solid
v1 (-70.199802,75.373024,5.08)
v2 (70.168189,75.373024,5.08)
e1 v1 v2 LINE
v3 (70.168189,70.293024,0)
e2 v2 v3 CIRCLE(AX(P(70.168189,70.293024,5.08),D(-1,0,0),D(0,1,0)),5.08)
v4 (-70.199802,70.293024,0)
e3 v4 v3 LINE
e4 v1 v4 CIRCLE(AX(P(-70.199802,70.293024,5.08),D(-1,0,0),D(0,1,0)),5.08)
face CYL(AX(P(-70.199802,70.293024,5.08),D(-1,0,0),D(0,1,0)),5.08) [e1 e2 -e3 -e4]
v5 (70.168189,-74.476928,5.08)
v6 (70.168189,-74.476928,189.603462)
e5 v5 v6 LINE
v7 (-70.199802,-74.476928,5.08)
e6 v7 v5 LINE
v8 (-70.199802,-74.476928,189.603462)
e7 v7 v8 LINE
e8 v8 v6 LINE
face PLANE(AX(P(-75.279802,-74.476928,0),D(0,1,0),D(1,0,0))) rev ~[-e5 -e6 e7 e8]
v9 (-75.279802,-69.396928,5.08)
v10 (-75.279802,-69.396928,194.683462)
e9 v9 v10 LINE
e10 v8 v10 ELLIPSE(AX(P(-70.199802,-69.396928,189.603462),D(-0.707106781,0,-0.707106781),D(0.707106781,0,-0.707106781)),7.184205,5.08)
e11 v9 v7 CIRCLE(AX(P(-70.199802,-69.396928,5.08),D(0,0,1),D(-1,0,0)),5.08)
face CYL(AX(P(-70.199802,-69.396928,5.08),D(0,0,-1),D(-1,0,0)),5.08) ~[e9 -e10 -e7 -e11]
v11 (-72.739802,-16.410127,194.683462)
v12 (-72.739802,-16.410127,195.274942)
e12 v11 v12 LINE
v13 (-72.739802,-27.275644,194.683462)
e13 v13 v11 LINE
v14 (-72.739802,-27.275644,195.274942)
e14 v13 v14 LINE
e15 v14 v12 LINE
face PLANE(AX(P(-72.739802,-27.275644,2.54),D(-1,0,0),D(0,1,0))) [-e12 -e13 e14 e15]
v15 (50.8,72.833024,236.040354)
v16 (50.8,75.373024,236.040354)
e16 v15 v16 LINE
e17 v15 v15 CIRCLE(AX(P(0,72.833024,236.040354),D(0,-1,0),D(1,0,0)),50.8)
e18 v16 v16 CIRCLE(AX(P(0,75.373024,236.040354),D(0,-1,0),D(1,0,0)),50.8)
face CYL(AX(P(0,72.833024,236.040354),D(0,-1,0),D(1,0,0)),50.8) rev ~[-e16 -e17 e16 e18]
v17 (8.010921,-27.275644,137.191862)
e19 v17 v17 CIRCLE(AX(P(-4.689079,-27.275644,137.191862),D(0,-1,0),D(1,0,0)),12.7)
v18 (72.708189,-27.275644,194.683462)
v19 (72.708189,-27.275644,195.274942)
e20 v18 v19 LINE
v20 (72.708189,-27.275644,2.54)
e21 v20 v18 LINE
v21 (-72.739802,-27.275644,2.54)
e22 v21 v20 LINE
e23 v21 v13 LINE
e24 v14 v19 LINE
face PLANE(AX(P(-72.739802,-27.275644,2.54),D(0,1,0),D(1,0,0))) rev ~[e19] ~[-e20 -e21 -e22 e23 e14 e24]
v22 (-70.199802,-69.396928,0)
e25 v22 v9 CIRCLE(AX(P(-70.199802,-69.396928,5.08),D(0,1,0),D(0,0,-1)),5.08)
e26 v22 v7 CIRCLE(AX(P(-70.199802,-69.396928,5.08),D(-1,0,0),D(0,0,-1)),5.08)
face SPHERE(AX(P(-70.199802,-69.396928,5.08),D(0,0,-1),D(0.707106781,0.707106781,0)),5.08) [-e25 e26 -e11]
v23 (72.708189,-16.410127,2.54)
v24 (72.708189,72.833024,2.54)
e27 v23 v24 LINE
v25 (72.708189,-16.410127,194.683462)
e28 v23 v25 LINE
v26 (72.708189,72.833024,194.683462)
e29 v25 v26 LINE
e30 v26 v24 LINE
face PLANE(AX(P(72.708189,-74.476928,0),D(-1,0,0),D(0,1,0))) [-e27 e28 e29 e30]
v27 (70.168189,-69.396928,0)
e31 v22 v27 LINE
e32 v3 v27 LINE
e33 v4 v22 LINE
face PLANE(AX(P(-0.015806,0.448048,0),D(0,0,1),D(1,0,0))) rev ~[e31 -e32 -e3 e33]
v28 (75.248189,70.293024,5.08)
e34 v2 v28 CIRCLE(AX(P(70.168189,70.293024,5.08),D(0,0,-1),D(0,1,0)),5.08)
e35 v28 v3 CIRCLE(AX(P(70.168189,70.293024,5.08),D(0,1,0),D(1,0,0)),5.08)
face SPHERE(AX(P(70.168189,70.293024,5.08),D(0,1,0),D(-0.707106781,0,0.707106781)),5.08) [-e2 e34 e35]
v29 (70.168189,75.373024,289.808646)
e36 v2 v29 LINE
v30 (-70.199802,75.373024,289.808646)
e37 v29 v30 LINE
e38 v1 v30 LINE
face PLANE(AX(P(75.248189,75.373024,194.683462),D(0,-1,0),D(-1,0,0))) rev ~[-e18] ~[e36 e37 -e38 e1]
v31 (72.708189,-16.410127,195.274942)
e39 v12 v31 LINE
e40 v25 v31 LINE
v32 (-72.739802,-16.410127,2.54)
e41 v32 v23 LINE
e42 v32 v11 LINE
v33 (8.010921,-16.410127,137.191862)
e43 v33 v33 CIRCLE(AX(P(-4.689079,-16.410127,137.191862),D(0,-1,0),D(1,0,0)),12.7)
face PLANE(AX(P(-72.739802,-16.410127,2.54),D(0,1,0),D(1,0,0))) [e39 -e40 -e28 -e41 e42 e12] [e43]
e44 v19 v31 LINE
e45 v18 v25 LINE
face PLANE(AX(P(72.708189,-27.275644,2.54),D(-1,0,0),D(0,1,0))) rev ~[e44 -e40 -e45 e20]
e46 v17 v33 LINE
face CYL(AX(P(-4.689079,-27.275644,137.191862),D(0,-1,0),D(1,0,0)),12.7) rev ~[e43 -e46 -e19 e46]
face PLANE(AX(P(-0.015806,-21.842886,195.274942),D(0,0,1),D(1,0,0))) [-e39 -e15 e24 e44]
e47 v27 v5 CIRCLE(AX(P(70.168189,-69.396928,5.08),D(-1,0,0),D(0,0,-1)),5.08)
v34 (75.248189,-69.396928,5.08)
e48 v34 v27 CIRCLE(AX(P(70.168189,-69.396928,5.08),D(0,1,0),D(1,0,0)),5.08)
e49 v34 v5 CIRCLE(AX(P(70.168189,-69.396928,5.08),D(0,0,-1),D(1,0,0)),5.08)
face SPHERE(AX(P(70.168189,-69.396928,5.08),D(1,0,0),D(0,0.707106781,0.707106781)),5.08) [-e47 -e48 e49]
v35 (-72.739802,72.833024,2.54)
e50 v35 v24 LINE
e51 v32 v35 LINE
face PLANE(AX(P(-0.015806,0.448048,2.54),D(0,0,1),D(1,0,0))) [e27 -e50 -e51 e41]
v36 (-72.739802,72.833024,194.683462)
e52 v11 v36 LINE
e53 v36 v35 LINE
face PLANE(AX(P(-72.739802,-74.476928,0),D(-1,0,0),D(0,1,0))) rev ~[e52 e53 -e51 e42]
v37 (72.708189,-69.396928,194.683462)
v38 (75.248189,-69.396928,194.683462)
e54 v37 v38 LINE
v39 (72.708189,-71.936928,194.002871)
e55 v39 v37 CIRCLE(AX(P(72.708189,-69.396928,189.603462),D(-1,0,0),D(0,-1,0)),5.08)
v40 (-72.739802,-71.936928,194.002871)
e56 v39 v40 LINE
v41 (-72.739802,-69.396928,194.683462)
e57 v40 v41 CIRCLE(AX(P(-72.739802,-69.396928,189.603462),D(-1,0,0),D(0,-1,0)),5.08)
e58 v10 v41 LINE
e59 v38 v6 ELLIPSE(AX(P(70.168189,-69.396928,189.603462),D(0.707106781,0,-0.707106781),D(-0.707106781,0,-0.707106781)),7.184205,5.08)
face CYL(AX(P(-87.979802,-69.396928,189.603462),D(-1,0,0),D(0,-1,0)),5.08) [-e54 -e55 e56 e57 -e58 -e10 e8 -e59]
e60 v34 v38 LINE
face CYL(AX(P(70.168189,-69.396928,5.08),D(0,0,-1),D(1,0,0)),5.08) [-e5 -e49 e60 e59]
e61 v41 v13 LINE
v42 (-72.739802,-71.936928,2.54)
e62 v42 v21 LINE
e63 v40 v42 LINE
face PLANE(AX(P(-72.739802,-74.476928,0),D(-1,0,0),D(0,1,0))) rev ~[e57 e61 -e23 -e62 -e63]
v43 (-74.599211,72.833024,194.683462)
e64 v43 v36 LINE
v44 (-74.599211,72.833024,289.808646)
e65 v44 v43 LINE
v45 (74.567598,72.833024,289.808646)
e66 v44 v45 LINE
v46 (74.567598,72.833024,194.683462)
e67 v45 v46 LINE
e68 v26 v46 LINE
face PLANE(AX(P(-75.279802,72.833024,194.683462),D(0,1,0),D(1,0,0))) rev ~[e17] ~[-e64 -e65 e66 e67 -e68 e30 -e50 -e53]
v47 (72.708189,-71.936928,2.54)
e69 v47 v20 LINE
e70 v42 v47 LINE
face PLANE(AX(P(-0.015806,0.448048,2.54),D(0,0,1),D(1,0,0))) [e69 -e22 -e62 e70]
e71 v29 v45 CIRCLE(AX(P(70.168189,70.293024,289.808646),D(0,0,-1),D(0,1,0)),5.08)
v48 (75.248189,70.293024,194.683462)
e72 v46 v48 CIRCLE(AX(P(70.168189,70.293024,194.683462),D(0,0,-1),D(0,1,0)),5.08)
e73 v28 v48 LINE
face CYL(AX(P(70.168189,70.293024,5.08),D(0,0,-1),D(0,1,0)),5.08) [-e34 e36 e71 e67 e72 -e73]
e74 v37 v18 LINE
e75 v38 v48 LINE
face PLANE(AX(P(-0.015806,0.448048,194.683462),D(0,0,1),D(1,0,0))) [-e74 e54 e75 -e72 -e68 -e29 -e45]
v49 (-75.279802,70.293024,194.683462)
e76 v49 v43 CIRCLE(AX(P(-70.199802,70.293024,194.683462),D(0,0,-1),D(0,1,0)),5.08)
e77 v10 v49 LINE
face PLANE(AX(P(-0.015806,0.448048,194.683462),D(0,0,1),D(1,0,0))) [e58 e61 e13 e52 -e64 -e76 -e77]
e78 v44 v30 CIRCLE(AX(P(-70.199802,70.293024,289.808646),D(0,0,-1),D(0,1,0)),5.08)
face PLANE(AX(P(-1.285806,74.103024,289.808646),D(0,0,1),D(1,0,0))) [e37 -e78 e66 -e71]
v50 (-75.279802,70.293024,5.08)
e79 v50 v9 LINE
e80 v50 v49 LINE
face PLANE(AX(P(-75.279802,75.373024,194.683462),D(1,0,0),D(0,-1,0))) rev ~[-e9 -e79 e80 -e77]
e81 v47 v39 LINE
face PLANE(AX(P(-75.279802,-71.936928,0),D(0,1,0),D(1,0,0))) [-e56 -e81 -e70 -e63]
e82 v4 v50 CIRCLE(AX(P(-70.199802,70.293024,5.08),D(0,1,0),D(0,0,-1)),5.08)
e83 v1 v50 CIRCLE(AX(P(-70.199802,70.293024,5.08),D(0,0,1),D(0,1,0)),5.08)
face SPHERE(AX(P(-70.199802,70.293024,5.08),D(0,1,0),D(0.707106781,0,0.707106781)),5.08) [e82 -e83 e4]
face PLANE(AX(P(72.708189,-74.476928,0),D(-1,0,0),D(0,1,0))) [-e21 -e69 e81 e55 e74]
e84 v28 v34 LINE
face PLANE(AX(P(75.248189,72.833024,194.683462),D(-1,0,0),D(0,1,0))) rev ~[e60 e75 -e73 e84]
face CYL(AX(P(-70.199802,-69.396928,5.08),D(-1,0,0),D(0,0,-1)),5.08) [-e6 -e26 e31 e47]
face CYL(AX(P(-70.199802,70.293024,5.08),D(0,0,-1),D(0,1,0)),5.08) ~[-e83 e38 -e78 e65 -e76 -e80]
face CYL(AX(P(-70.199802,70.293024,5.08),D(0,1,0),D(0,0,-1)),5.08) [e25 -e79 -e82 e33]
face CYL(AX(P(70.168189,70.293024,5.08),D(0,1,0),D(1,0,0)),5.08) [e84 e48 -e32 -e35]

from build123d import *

# Parameters (mm, degrees)
F0_W         = 150.5279913545
F0_H         = 149.8499512672
F1_DEPTH     = 194.6834623814
F2_T         = -2.54
F3_W         = 2.54
F3_H         = 2.54
F4_DEPTH     = 95.1251834631
F6_D         = 101.6
F6_DEPTH     = 2.541
F7_T1_DEPTH  = 202.3034623814
F7_T3_DEPTH  = 297.4286458445
F7_T5_DEPTH  = 140.3679913545
F7_T7_DEPTH  = 139.6899512672
F7_T9_DEPTH  = 175.9279913545
F7_S13_W     = 5.08
F7_S13_H     = 5.08
F7_T14_DEPTH = 5.08
F7_S19_W     = 5.08
F7_S19_H     = 5.08
F7_T20_DEPTH = 5.08
F7_S25_W     = 5.08
F7_S25_H     = 5.08
F7_T26_DEPTH = 5.08
F7_S31_W     = 5.08
F7_S31_H     = 5.08
F7_T32_DEPTH = 5.08
F8_W         = 145.4479913545
F8_H         = 10.8655169606
F9_DEPTH     = 192.7349418402
F11_D        = 25.4
F11_DEPTH    = 12.7
F11_TIP      = 7.6309298617


# Not quite as in the source:
# - a fillet or chamfer that OpenCascade refuses, or shapes differently, is made with other operations: its cross-section is extruded or revolved along the edge and cut away or added


with BuildPart() as f1:
    # F0 (on Top) → F1 (new body)
    with BuildSketch(Plane.XY):
        with Locations((-0.0158064067, 0.4480481148)):
            Rectangle(F0_W, F0_H)
    extrude(amount=F1_DEPTH)

    # F2
    f2_openings = [f1.faces().sort_by_distance(p)[0] for p in [
        (-0.015806, 0.448048, 194.683462),
    ]]
    offset(amount=F2_T, openings=f2_openings)

    # F3 (on face) → F4 (join)
    with BuildSketch(Plane.XY.offset(194.6834623814)):
        Polygon((72.7081892705, 75.3730237484), (-75.279802084, 75.3730237484), (-75.279802084, 72.8330237484), (-72.739802084, 72.8330237484), (72.7081892705, 72.8330237484), align=None)
        with Locations((73.9781892705, 74.1030237484)):
            Rectangle(F3_W, F3_H)
    extrude(amount=F4_DEPTH)

    # F6 (through all, one way)
    with BuildSketch(Plane.XZ.offset(-72.8330237484)):
        with Locations((0, 236.040353775)):
            Circle(F6_D / 2)
    extrude(amount=-F6_DEPTH, mode=Mode.SUBTRACT)

    # F7: fillet of radius 5.08 on 9 edges, made by hand

    # F7_s2 → F7_t1 (cut)
    with BuildSketch(Plane.XY.offset(5.08)):
        with BuildLine():
            ThreePointArc((-75.279802084, -69.3969275188), (-73.7919045324, -72.9890299673), (-70.199802084, -74.4769275188))
            Line((-70.199802084, -74.4769275188), (-75.279802084, -74.4769275188))
            Line((-75.279802084, -74.4769275188), (-75.279802084, -69.3969275188))
        make_face()
        with BuildLine():
            ThreePointArc((75.2481892705, -69.3969275188), (73.7602917189, -72.9890299673), (70.1681892705, -74.4769275188))
            Line((70.1681892705, -74.4769275188), (75.2481892705, -74.4769275188))
            Line((75.2481892705, -74.4769275188), (75.2481892705, -69.3969275188))
        make_face()
    extrude(amount=F7_T1_DEPTH, mode=Mode.SUBTRACT)

    # F7_s4 → F7_t3 (cut)
    with BuildSketch(Plane.XY.offset(5.08)):
        with BuildLine():
            ThreePointArc((-70.199802084, 75.3730237484), (-73.7919045324, 73.8851261968), (-75.279802084, 70.2930237484))
            Line((-75.279802084, 70.2930237484), (-75.279802084, 75.3730237484))
            Line((-75.279802084, 75.3730237484), (-70.199802084, 75.3730237484))
        make_face()
        with BuildLine():
            ThreePointArc((70.1681892705, 75.3730237484), (73.7602917189, 73.8851261968), (75.2481892705, 70.2930237484))
            Line((75.2481892705, 70.2930237484), (75.2481892705, 75.3730237484))
            Line((75.2481892705, 75.3730237484), (70.1681892705, 75.3730237484))
        make_face()
    extrude(amount=F7_T3_DEPTH, mode=Mode.SUBTRACT)

    # F7_s6 → F7_t5 (cut)
    with BuildSketch(Plane.YZ.offset(-70.199802084)):
        with BuildLine():
            ThreePointArc((75.3730237484, 5.08), (73.8851261968, 1.4878975516), (70.2930237484, 0))
            Line((70.2930237484, 0), (75.3730237484, 0))
            Line((75.3730237484, 0), (75.3730237484, 5.08))
        make_face()
        with BuildLine():
            ThreePointArc((-69.3969275188, 0), (-72.9890299673, 1.4878975516), (-74.4769275188, 5.08))
            Line((-74.4769275188, 5.08), (-74.4769275188, 0))
            Line((-74.4769275188, 0), (-69.3969275188, 0))
        make_face()
    extrude(amount=F7_T5_DEPTH, mode=Mode.SUBTRACT)

    # F7_s8 → F7_t7 (cut)
    with BuildSketch(Plane.XZ.offset(-70.2930237484)):
        with BuildLine():
            ThreePointArc((-70.199802084, 0), (-73.7919045324, 1.4878975516), (-75.279802084, 5.08))
            Line((-75.279802084, 5.08), (-75.279802084, 0))
            Line((-75.279802084, 0), (-70.199802084, 0))
        make_face()
        with BuildLine():
            ThreePointArc((75.2481892705, 5.08), (73.7602917189, 1.4878975516), (70.1681892705, 0))
            Line((70.1681892705, 0), (75.2481892705, 0))
            Line((75.2481892705, 0), (75.2481892705, 5.08))
        make_face()
    extrude(amount=F7_T7_DEPTH, mode=Mode.SUBTRACT)

    # F7_s10 → F7_t9 (cut)
    with BuildSketch(Plane.YZ.offset(-87.979802084)):
        with BuildLine():
            ThreePointArc((-74.4769275188, 189.6034623814), (-72.9890299673, 193.1955648298), (-69.3969275188, 194.6834623814))
            Line((-69.3969275188, 194.6834623814), (-74.4769275188, 194.6834623814))
            Line((-74.4769275188, 194.6834623814), (-74.4769275188, 189.6034623814))
        make_face()
    extrude(amount=F7_T9_DEPTH, mode=Mode.SUBTRACT)


with BuildPart() as f7_tool12:
    # F7_s13 → F7_t14 (new body)
    with BuildSketch(Plane.XY.offset(5.08)):
        with Locations((-72.739802084, -71.9369275188)):
            Rectangle(F7_S13_W, F7_S13_H)
    extrude(amount=-F7_T14_DEPTH)

    # F7_s15 → F7_t16 (revolve, cut)
    with BuildSketch(Plane(origin=(-70.199802084, -69.3969275188, 5.08), x_dir=(0.7071067812, 0.7071067812, 0), z_dir=(-0.7071067812, 0.7071067812, 0))):
        with BuildLine():
            ThreePointArc((0, -5.08), (5.08, 0), (0, 5.08))
            Line((0, 5.08), (0, -5.08))
        make_face()
    revolve(axis=Axis((-70.199802084, -69.3969275188, 5.08), (0, 0, -1)), mode=Mode.SUBTRACT)


with BuildPart() as f1_1:
    add(f1.part)

    # F7_t11: cut F7_tool12
    add(f7_tool12.part, mode=Mode.SUBTRACT)


with BuildPart() as f7_tool18:
    # F7_s19 → F7_t20 (new body)
    with BuildSketch(Plane.XZ.offset(-70.2930237484)):
        with Locations((-72.739802084, 2.54)):
            Rectangle(F7_S19_W, F7_S19_H)
    extrude(amount=-F7_T20_DEPTH)

    # F7_s21 → F7_t22 (revolve, cut)
    with BuildSketch(Plane(origin=(-70.199802084, 70.2930237484, 5.08), x_dir=(0.7071067812, 0, 0.7071067812), z_dir=(-0.7071067812, 0, 0.7071067812))):
        with BuildLine():
            ThreePointArc((0, -5.08), (5.08, 0), (0, 5.08))
            Line((0, 5.08), (0, -5.08))
        make_face()
    revolve(axis=Axis((-70.199802084, 70.2930237484, 5.08), (0, 1, 0)), mode=Mode.SUBTRACT)


with BuildPart() as f1_2:
    add(f1_1.part)

    # F7_t17: cut F7_tool18
    add(f7_tool18.part, mode=Mode.SUBTRACT)


with BuildPart() as f7_tool24:
    # F7_s25 → F7_t26 (new body)
    with BuildSketch(Plane.XZ.offset(-70.2930237484)):
        with Locations((72.7081892705, 2.54)):
            Rectangle(F7_S25_W, F7_S25_H)
    extrude(amount=-F7_T26_DEPTH)

    # F7_s27 → F7_t28 (revolve, cut)
    with BuildSketch(Plane(origin=(70.1681892705, 70.2930237484, 5.08), x_dir=(-0.7071067812, 0, 0.7071067812), z_dir=(-0.7071067812, 0, -0.7071067812))):
        with BuildLine():
            ThreePointArc((0, -5.08), (5.08, 0), (0, 5.08))
            Line((0, 5.08), (0, -5.08))
        make_face()
    revolve(axis=Axis((70.1681892705, 70.2930237484, 5.08), (0, 1, 0)), mode=Mode.SUBTRACT)


with BuildPart() as f1_3:
    add(f1_2.part)

    # F7_t23: cut F7_tool24
    add(f7_tool24.part, mode=Mode.SUBTRACT)


with BuildPart() as f7_tool30:
    # F7_s31 → F7_t32 (new body)
    with BuildSketch(Plane.YZ.offset(70.1681892705)):
        with Locations((-71.9369275188, 2.54)):
            Rectangle(F7_S31_W, F7_S31_H)
    extrude(amount=F7_T32_DEPTH)

    # F7_s33 → F7_t34 (revolve, cut)
    with BuildSketch(Plane(origin=(70.1681892705, -69.3969275188, 5.08), x_dir=(0, 0.7071067812, 0.7071067812), z_dir=(0, 0.7071067812, -0.7071067812))):
        with BuildLine():
            ThreePointArc((0, -5.08), (5.08, 0), (0, 5.08))
            Line((0, 5.08), (0, -5.08))
        make_face()
    revolve(axis=Axis((70.1681892705, -69.3969275188, 5.08), (1, 0, 0)), mode=Mode.SUBTRACT)


with BuildPart() as f1_4:
    add(f1_3.part)

    # F7_t29: cut F7_tool30
    add(f7_tool30.part, mode=Mode.SUBTRACT)

    # F8 (on face) → F9 (join)
    with BuildSketch(Plane.XY.offset(2.54)):
        with Locations((-0.0158064067, -21.8428857625)):
            Rectangle(F8_W, F8_H)
    extrude(amount=F9_DEPTH)

    # F11 (one way)
    with BuildSketch(Plane.XZ.offset(27.2756442428)):
        with Locations((-4.689078778, 137.1918618679)):
            Circle(F11_D / 2)
    extrude(amount=-F11_DEPTH, mode=Mode.SUBTRACT)
    with Locations(Plane.XZ.offset(27.2756442428)):
        with Locations((-4.689078778, 137.1918618679)):
            with Locations((0, 0, -(F11_DEPTH + F11_TIP / 2))):  # 118° drill point
                Cone(0, F11_D / 2, F11_TIP, mode=Mode.SUBTRACT)


solid = f1_4.part
